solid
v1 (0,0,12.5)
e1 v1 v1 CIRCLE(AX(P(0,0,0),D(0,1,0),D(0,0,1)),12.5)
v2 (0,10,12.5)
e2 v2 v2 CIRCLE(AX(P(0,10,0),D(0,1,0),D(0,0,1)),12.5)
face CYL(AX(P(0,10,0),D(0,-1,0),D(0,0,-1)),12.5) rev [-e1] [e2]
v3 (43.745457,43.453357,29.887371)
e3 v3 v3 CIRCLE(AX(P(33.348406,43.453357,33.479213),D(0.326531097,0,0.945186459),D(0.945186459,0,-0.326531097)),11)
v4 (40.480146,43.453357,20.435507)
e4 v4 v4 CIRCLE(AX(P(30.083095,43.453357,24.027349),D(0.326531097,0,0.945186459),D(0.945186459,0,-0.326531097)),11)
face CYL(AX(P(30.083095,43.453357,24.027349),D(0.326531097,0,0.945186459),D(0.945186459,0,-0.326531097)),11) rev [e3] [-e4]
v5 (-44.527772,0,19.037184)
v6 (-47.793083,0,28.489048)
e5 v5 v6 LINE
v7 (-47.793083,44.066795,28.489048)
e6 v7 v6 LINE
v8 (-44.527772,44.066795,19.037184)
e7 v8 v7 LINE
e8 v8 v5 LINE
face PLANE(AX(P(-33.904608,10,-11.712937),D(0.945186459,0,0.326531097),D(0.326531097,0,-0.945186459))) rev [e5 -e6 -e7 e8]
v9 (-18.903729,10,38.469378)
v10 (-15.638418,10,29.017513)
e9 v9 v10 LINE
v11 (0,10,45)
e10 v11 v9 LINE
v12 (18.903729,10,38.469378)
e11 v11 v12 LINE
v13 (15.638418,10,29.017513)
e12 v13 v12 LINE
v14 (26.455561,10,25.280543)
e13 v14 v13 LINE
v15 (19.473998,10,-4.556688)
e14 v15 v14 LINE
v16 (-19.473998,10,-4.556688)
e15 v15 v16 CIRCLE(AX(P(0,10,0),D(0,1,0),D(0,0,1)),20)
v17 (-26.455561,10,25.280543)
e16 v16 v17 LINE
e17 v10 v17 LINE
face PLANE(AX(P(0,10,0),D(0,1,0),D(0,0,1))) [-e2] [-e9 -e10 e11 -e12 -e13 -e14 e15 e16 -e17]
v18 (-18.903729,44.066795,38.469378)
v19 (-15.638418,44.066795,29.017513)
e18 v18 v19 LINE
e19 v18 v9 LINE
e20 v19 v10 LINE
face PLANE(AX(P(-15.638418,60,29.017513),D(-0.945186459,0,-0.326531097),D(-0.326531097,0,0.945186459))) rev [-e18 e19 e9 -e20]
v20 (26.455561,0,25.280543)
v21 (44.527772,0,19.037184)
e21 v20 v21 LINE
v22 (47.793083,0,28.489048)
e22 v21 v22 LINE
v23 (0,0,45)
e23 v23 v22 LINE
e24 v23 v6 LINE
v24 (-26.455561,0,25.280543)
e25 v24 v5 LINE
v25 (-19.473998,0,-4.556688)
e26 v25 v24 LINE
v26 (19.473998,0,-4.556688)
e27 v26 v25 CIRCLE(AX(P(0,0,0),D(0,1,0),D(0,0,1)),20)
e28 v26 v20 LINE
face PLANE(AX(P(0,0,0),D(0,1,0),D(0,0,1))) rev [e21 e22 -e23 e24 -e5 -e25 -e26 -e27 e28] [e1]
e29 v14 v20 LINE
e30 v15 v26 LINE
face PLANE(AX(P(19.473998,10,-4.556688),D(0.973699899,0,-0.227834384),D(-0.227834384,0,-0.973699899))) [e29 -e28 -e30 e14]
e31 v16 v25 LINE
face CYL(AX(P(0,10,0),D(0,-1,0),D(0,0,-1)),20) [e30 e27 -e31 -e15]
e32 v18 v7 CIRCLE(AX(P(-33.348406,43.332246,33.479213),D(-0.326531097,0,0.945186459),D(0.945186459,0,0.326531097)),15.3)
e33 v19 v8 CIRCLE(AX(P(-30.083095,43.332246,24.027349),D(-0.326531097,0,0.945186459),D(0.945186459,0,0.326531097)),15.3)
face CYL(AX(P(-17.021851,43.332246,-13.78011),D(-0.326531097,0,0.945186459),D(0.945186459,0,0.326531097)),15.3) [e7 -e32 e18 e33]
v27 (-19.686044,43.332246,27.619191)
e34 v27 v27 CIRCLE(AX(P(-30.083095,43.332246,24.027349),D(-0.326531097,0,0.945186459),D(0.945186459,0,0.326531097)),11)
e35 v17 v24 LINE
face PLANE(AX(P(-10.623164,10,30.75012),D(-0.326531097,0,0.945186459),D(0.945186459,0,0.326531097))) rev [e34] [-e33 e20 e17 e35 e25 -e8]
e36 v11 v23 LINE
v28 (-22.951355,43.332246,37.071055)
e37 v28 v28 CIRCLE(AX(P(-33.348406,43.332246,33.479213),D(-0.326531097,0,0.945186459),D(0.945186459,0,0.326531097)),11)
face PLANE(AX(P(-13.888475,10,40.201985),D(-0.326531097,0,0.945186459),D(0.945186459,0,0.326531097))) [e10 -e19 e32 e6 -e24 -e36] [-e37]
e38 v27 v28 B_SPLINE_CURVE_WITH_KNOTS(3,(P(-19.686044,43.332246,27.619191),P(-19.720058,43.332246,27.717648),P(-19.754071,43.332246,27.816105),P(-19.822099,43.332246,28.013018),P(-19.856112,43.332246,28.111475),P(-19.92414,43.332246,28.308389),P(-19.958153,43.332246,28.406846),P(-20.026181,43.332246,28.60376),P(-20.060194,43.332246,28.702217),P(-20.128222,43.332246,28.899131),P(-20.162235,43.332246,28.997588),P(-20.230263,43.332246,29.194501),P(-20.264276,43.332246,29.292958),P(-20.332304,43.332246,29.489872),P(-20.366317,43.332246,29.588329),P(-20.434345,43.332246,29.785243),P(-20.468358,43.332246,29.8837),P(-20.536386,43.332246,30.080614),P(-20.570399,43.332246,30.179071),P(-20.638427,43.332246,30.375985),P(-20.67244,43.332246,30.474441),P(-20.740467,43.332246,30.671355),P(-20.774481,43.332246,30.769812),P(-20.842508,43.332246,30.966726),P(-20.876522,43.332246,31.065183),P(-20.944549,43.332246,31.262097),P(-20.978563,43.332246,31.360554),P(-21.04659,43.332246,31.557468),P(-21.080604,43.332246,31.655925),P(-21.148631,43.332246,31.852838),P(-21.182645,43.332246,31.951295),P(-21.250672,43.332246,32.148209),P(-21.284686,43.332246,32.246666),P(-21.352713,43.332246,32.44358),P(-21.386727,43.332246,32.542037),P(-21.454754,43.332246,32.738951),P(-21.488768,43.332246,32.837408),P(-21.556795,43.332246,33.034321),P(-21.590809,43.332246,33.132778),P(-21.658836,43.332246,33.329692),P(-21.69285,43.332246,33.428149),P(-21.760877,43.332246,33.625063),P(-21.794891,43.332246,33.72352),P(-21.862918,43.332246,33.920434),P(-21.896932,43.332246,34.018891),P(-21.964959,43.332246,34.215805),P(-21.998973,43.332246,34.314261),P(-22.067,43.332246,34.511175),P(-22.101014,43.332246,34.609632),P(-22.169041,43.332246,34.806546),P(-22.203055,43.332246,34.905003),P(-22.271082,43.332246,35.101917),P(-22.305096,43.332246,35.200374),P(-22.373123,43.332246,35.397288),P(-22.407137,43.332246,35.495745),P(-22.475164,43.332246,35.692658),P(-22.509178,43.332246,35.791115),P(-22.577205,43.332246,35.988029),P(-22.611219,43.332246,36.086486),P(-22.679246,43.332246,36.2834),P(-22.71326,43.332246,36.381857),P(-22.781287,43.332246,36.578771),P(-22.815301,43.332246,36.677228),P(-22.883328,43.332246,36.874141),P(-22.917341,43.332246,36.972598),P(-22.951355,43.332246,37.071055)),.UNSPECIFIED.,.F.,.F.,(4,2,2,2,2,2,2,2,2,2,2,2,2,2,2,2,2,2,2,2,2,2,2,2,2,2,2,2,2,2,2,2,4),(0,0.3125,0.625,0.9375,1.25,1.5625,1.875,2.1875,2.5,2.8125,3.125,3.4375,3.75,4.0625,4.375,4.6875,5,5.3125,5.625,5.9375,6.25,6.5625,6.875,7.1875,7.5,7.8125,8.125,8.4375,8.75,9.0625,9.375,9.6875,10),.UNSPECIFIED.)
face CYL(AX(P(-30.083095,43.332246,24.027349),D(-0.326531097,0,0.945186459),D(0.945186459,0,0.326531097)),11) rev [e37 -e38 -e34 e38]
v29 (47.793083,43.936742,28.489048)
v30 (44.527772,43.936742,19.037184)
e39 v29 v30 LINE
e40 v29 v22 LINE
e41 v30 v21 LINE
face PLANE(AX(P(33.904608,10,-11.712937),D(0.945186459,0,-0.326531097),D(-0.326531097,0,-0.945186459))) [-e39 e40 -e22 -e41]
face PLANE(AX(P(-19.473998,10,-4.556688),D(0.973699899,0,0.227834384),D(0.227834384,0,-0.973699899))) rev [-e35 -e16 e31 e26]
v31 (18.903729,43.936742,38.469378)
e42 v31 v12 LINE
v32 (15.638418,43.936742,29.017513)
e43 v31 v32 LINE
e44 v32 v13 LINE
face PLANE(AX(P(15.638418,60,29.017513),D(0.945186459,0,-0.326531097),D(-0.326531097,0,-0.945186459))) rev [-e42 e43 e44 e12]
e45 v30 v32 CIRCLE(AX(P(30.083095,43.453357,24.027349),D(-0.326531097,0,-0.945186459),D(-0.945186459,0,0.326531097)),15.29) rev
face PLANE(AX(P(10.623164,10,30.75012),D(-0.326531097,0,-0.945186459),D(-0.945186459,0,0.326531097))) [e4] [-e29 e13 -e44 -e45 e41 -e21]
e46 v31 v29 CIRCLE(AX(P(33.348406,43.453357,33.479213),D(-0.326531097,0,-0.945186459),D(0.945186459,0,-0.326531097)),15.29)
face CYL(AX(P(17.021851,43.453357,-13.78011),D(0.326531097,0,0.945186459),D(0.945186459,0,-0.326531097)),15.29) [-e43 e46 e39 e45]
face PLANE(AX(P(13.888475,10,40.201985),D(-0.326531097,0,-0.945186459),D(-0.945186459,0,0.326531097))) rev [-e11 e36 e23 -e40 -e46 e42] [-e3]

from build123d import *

# Parameters (mm, degrees)
BOSS_EXTRUDE1_DEPTH = 10
BOSS_EXTRUDE3_DEPTH = 50
CUT_EXTRUDE2_START  = -10
CUT_EXTRUDE2_DEPTH  = 10
CUT_EXTRUDE3_START  = -10
CUT_EXTRUDE3_DEPTH  = 10
SKETCH9_R           = 11
CUT_EXTRUDE4_DEPTH  = 10
SKETCH10_R          = 11
CUT_EXTRUDE5_DEPTH  = 10


# Read off the part's stored shape, not the designer's step: Cut-Extrude2, Cut-Extrude3
with BuildPart() as part:
    # Sketch2 → Boss-Extrude1 (new body)
    with BuildSketch(Plane(origin=(0, 0, 0), x_dir=(1, 0, 0), z_dir=(0, 1, 0))):
        with BuildLine():
            ThreePointArc((0, 20), (-12.427112426, 15.670573594), (-19.473997983, 4.556687675))
            Line((-19.473997983, 4.556687675), (-26.455560952, -25.280543414))
            Line((-26.455560952, -25.280543414), (-15.63841821, -29.017513463))
            Line((-15.63841821, -29.017513463), (-18.903729183, -38.469378055))
            Line((-18.903729183, -38.469378055), (0, -45))
            Line((0, -45), (0, -12.5))
            ThreePointArc((0, -12.5), (-12.5, 0), (0, 12.5))
            Line((0, 12.5), (0, 20))
        make_face()
        with BuildLine():
            ThreePointArc((19.473997983, 4.556687675), (12.427112426, 15.670573594), (0, 20))
            Line((0, 20), (0, 12.5))
            ThreePointArc((0, 12.5), (8.838834765, 8.838834765), (12.5, 0))
            ThreePointArc((12.5, 0), (8.838834765, -8.838834765), (0, -12.5))
            Line((0, -12.5), (0, -45))
            Line((0, -45), (18.903729183, -38.469378055))
            Line((18.903729183, -38.469378055), (15.63841821, -29.017513463))
            Line((15.63841821, -29.017513463), (26.455560952, -25.280543414))
            Line((26.455560952, -25.280543414), (19.473997983, 4.556687675))
        make_face()
        Polygon((44.52777222, -19.037183791), (26.455560952, -25.280543414), (15.63841821, -29.017513463), (18.903729183, -38.469378055), (47.793083193, -28.489048382), align=None)
        Polygon((-15.63841821, -29.017513463), (-26.455560952, -25.280543414), (-44.52777222, -19.037183791), (-47.793083193, -28.489048382), (-18.903729183, -38.469378055), align=None)
    extrude(amount=BOSS_EXTRUDE1_DEPTH)

    # Sketch6 → Boss-Extrude3 (add)
    with BuildSketch(Plane(origin=(0, 10, 0), x_dir=(1, 0, 0), z_dir=(0, 1, 0))):
        Polygon((47.793083193, -28.489048382), (44.52777222, -19.037183791), (15.63841821, -29.017513463), (18.903729183, -38.469378055), align=None)
        Polygon((-47.793083193, -28.489048382), (-44.52777222, -19.037183791), (-15.63841821, -29.017513463), (-18.903729183, -38.469378055), align=None)
    extrude(amount=BOSS_EXTRUDE3_DEPTH)

    # Cut-Extrude2 outline → Cut-Extrude2 (cut)
    with BuildSketch(Plane(origin=(-13.888474723, 0, 40.201984913), x_dir=(0.9451864591285483, 0, 0.32653109726339585), z_dir=(-0.3265310972633958, 0, 0.9451864591285482)).offset(CUT_EXTRUDE2_START)):
        with BuildLine():
            ThreePointArc((-35.870814845, 44.066794658), (-20.588457734, 58.63224641), (-5.306100623, 44.066794658))
            Line((-5.306100623, 44.066794658), (-5.306100623, 60))
            Line((-5.306100623, 60), (-35.870814845, 60))
            Line((-35.870814845, 60), (-35.870814845, 44.066794658))
        make_face()
    extrude(amount=CUT_EXTRUDE2_DEPTH, mode=Mode.SUBTRACT)

    # Cut-Extrude3 outline → Cut-Extrude3 (cut)
    with BuildSketch(Plane(origin=(13.888474723, 0, 40.201984913), x_dir=(0.9451864591285483, 0, -0.3265310972633959), z_dir=(0.3265310972633959, 0, 0.9451864591285483)).offset(CUT_EXTRUDE3_START)):
        with BuildLine():
            ThreePointArc((5.306100623, 43.936741919), (20.588457734, 58.743356846), (35.870814845, 43.936741919))
            Line((35.870814845, 43.936741919), (35.870814845, 60))
            Line((35.870814845, 60), (5.306100623, 60))
            Line((5.306100623, 60), (5.306100623, 43.936741919))
        make_face()
    extrude(amount=CUT_EXTRUDE3_DEPTH, mode=Mode.SUBTRACT)

    # Sketch9 → Cut-Extrude4 (cut)
    with BuildSketch(Plane(origin=(-13.888474723, 0, 40.201984913), x_dir=(0.9451864591285483, 0, 0.32653109726339585), z_dir=(-0.3265310972633958, 0, 0.9451864591285482))):
        with Locations((-20.588457734, 43.33224641)):
            Circle(SKETCH9_R)
    extrude(amount=-CUT_EXTRUDE4_DEPTH, mode=Mode.SUBTRACT)

    # Sketch10 → Cut-Extrude5 (cut)
    with BuildSketch(Plane(origin=(13.888474723, 0, 40.201984913), x_dir=(0.9451864591285483, 0, -0.3265310972633959), z_dir=(0.3265310972633959, 0, 0.9451864591285483))):
        with Locations((20.588457734, 43.453356846)):
            Circle(SKETCH10_R)
    extrude(amount=-CUT_EXTRUDE5_DEPTH, mode=Mode.SUBTRACT)


solid = part.part
